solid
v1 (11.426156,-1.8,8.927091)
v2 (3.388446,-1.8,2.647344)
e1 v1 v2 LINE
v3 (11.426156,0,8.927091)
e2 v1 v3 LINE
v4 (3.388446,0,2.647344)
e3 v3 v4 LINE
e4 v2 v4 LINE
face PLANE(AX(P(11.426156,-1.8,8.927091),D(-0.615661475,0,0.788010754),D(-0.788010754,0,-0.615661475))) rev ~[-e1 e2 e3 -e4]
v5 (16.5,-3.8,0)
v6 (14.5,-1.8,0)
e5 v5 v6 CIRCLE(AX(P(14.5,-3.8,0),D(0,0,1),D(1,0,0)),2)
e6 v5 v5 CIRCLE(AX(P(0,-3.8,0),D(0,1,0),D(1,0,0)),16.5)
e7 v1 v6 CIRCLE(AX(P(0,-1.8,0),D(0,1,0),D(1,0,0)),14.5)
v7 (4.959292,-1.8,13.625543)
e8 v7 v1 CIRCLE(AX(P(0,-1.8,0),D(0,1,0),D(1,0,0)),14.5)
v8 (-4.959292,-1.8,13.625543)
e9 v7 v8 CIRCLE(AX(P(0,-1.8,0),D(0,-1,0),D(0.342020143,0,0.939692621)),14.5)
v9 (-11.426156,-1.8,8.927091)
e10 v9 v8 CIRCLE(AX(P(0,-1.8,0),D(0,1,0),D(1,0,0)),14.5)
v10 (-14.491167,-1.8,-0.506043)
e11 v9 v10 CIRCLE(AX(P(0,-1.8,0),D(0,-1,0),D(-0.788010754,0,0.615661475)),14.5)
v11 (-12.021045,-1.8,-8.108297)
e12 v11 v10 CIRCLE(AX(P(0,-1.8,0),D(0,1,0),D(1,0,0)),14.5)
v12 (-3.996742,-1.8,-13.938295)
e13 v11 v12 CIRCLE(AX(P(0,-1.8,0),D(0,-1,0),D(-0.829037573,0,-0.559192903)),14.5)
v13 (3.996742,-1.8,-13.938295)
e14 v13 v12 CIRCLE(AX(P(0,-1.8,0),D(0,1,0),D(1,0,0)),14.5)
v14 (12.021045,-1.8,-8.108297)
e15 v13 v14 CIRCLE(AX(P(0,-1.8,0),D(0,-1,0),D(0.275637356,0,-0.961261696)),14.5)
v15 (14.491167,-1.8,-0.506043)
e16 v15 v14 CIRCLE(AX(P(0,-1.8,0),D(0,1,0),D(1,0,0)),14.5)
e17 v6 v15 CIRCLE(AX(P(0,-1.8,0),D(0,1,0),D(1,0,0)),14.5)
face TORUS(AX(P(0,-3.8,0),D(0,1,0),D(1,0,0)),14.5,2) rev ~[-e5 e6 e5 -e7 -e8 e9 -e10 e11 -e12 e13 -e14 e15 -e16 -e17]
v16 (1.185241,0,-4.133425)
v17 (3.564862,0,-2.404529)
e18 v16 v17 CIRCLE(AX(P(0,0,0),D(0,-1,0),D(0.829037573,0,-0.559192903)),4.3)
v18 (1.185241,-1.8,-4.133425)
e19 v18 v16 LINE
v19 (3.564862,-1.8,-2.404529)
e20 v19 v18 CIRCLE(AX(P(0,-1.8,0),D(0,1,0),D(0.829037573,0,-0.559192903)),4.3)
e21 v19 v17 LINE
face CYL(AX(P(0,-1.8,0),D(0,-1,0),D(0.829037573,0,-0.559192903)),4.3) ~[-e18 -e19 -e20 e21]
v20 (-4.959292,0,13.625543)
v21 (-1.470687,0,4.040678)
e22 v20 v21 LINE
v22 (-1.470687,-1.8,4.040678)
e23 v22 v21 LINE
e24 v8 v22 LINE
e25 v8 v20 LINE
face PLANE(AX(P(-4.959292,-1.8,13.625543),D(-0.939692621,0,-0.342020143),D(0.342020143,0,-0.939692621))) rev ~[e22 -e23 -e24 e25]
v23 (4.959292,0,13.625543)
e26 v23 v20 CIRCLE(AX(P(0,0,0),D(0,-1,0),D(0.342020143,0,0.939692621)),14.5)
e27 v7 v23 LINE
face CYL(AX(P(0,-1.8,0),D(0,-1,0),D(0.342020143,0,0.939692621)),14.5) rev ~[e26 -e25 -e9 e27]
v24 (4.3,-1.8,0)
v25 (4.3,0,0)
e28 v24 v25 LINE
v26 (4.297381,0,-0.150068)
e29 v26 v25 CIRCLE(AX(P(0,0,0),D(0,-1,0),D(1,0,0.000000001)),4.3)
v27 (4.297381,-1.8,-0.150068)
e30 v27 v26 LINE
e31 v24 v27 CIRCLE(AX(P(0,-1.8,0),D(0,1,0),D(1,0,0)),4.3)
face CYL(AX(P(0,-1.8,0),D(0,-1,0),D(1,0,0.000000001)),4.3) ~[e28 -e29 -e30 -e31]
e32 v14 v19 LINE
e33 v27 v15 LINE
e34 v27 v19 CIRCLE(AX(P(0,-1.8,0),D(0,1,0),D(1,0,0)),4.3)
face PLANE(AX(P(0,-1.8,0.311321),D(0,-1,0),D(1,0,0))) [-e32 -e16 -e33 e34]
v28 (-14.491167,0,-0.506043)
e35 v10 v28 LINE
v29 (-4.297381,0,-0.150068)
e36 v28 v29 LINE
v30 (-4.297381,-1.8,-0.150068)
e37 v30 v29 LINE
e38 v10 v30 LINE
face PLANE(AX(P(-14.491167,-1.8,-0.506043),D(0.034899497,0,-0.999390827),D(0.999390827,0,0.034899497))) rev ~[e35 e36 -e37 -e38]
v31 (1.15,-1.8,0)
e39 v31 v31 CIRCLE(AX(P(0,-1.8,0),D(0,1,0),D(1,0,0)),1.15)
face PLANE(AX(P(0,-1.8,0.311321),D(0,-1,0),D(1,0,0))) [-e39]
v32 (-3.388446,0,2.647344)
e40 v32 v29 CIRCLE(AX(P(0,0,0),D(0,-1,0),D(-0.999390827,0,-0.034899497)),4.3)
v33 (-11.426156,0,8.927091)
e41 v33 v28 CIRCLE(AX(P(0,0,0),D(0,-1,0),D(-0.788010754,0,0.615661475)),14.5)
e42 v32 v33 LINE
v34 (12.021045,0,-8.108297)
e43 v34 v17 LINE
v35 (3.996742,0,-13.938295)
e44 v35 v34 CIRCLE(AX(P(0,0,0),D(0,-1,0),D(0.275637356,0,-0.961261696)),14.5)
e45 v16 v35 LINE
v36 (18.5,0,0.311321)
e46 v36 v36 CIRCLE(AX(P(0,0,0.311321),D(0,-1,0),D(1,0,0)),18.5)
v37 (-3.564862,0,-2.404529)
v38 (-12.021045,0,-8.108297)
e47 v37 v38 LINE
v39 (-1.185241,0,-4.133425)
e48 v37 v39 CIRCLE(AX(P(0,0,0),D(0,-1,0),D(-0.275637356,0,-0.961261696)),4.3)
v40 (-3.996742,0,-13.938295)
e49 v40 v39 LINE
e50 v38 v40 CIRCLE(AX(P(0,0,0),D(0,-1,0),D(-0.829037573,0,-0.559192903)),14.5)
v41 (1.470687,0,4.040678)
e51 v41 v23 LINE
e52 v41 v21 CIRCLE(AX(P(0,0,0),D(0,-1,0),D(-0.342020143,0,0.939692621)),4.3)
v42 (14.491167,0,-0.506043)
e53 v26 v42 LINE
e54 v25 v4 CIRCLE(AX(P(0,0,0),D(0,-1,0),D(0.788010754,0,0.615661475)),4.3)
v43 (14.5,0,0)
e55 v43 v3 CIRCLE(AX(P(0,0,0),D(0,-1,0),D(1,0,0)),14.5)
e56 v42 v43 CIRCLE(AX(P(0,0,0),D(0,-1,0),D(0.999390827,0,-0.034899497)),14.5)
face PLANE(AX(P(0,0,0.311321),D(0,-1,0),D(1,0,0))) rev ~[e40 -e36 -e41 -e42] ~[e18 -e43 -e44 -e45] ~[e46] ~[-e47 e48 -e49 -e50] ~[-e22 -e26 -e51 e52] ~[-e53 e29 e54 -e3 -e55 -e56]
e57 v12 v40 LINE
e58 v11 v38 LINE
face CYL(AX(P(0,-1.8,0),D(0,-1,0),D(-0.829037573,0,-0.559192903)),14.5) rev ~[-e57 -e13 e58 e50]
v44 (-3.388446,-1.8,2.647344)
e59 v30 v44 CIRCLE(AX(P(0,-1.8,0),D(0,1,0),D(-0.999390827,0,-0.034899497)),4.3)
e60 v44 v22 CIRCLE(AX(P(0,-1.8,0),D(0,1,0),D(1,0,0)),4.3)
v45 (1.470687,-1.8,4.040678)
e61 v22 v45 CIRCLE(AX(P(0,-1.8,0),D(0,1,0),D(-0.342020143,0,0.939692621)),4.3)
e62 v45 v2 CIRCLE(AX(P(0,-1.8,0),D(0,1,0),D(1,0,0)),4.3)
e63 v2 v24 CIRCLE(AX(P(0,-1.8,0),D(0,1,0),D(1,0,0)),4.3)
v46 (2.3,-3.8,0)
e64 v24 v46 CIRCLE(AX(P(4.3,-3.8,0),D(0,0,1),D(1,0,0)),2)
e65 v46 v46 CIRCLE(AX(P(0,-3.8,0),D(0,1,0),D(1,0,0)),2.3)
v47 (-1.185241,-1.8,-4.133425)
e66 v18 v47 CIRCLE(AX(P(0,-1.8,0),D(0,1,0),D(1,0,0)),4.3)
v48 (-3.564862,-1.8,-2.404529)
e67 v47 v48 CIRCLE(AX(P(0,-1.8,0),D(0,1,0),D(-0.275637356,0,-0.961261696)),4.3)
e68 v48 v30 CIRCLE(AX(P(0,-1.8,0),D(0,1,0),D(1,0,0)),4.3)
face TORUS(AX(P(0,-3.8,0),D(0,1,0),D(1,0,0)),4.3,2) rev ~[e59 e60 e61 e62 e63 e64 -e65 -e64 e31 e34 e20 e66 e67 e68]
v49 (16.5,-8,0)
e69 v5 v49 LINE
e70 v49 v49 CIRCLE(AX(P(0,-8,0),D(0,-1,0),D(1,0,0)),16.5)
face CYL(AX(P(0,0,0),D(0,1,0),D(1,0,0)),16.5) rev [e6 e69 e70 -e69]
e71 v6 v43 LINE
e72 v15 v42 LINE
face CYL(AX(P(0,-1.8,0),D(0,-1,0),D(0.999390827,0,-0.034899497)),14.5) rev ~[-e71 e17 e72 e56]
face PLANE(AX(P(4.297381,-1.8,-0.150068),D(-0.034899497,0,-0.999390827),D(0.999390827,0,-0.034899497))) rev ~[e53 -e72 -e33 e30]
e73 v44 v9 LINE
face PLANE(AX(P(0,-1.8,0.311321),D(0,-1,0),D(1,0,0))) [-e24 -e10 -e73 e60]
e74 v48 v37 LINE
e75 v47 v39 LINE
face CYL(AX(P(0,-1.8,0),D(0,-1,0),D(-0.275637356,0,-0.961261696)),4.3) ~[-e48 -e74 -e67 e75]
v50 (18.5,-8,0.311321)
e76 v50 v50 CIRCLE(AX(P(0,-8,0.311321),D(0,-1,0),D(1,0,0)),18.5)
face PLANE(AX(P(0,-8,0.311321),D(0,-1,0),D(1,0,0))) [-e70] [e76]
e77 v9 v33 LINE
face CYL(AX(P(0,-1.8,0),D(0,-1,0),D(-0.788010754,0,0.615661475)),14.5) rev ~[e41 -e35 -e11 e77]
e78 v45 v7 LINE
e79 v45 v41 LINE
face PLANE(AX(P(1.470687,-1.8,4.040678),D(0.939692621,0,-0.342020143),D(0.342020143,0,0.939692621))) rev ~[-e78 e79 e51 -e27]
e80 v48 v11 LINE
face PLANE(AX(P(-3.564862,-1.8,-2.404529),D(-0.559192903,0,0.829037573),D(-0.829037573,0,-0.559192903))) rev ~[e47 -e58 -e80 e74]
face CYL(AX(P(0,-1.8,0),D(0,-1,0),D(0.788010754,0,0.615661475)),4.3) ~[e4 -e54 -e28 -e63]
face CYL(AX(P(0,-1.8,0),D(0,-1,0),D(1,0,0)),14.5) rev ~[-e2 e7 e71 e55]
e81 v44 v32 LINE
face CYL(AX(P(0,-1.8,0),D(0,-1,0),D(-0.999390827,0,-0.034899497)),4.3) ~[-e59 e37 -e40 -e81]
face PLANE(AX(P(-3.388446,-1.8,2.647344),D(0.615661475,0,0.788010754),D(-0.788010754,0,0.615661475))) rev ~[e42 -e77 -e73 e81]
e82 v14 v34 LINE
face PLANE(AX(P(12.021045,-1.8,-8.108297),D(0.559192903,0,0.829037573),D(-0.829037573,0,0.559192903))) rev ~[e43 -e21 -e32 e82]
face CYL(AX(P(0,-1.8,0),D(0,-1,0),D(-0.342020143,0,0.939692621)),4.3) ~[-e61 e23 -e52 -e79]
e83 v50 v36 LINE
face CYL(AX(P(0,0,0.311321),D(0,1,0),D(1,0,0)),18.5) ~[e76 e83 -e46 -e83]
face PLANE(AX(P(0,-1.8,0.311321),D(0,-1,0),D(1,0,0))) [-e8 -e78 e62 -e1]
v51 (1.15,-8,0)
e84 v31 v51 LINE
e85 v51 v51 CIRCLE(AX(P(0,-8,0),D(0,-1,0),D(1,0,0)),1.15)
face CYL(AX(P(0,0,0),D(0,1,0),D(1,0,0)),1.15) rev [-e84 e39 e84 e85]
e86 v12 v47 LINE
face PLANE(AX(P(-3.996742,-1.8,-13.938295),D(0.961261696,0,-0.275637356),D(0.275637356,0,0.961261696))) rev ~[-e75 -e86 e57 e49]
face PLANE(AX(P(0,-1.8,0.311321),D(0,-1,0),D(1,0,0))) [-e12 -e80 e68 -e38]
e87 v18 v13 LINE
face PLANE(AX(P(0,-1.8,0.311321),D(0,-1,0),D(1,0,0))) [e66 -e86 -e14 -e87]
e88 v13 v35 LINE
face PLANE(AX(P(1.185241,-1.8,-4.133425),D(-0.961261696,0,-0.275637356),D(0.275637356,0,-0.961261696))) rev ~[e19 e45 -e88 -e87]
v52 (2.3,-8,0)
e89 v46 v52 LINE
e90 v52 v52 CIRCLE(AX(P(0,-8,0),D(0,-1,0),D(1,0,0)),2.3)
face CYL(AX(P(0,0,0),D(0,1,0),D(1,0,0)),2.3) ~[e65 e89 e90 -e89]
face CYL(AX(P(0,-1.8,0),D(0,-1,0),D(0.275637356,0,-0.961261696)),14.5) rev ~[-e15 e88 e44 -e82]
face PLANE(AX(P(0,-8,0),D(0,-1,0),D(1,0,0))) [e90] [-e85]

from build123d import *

# Parameters (mm, degrees)
F0_R     = 2.3
F0_R_2   = 1.15
F1_DEPTH = 8
F0_R_3   = 18.5
F0_R_4   = 16.5
F2_DEPTH = 8
F3_DEPTH = 1.8
F4_R     = 2
F6_DEPTH = 1.801


with BuildPart() as f1:
    # F0 (on Front) → F1 (new body)
    with BuildSketch(Plane.XZ):
        Circle(F0_R)
        Circle(F0_R_2, mode=Mode.SUBTRACT)
    extrude(amount=F1_DEPTH)



with BuildPart() as f2:
    # F0 (on Front) → F2 (new body)
    with BuildSketch(Plane.XZ):
        with Locations((0, 0.311320764)):
            Circle(F0_R_3)
        Circle(F0_R_4, mode=Mode.SUBTRACT)
    extrude(amount=F2_DEPTH)


with BuildPart() as f1_1:
    add(f1.part)

    add(f2.part)  # F3 merges F2
    # F0 (on Front) → F3 (join)
    with BuildSketch(Plane.XZ):
        with Locations((0, 0.311320764)):
            Circle(F0_R_3)
        Circle(F0_R_4, mode=Mode.SUBTRACT)
        Circle(F0_R_4)
        Circle(F0_R, mode=Mode.SUBTRACT)
        Circle(F0_R)
        Circle(F0_R_2, mode=Mode.SUBTRACT)
        Circle(F0_R_2)
    extrude(amount=F3_DEPTH)

    # F4
    f4_edges = [f1_1.edges().sort_by_distance(p)[0] for p in [
        (-16.5, -1.8, 0),
        (-2.3, -1.8, 0),
    ]]
    fillet(f4_edges, radius=F4_R)

    # F5 (on face) → F6 (cut, through all)
    with BuildSketch(Plane.XZ.offset(1.8)):
        with BuildLine():
            Line((1.4706866163, 4.0406782694), (4.9592920782, 13.6255430014))
            ThreePointArc((4.9592920782, 13.6255430014), (0, 14.5), (-4.9592920782, 13.6255430014))
            Line((-4.9592920782, 13.6255430014), (-1.4706866163, 4.0406782694))
            ThreePointArc((-1.4706866163, 4.0406782694), (0, 4.3), (1.4706866163, 4.0406782694))
        make_face()
        with BuildLine():
            ThreePointArc((14.4911669918, -0.5060427022), (14.4977915798, -0.2530598933), (14.5, 0))
            ThreePointArc((14.5, 0), (13.7100193462, 4.7207382396), (11.4261559273, 8.9270913922))
            Line((11.4261559273, 8.9270913922), (3.3884462405, 2.6473443439))
            ThreePointArc((3.3884462405, 2.6473443439), (4.0657298751, 1.3999430642), (4.3, 0))
            ThreePointArc((4.3, 0), (4.2993450892, -0.0750453477), (4.2973805562, -0.1500678358))
            Line((4.2973805562, -0.1500678358), (14.4911669918, -0.5060427022))
        make_face()
        with BuildLine():
            ThreePointArc((3.9967416593, -13.9382945911), (8.5228861582, -11.7307464184), (12.021044802, -8.1082971003))
            Line((12.021044802, -8.1082971003), (3.564861562, -2.4045294849))
            ThreePointArc((3.564861562, -2.4045294849), (2.5274765849, -3.4787730758), (1.18524063, -4.1334252925))
            Line((1.18524063, -4.1334252925), (3.9967416593, -13.9382945911))
        make_face()
        with BuildLine():
            ThreePointArc((-12.021044802, -8.1082971003), (-8.5228861582, -11.7307464184), (-3.9967416593, -13.9382945911))
            Line((-3.9967416593, -13.9382945911), (-1.18524063, -4.1334252925))
            ThreePointArc((-1.18524063, -4.1334252925), (-2.5274765849, -3.4787730758), (-3.564861562, -2.4045294849))
            Line((-3.564861562, -2.4045294849), (-12.021044802, -8.1082971003))
        make_face()
        with BuildLine():
            Line((-3.3884462405, 2.6473443439), (-11.4261559273, 8.9270913922))
            ThreePointArc((-11.4261559273, 8.9270913922), (-13.7903194863, 4.4807464184), (-14.4911669918, -0.5060427022))
            Line((-14.4911669918, -0.5060427022), (-4.2973805562, -0.1500678358))
            ThreePointArc((-4.2973805562, -0.1500678358), (-4.0895430201, 1.3287730758), (-3.3884462405, 2.6473443439))
        make_face()
    extrude(amount=-F6_DEPTH, mode=Mode.SUBTRACT)


solid = f1_1.part
